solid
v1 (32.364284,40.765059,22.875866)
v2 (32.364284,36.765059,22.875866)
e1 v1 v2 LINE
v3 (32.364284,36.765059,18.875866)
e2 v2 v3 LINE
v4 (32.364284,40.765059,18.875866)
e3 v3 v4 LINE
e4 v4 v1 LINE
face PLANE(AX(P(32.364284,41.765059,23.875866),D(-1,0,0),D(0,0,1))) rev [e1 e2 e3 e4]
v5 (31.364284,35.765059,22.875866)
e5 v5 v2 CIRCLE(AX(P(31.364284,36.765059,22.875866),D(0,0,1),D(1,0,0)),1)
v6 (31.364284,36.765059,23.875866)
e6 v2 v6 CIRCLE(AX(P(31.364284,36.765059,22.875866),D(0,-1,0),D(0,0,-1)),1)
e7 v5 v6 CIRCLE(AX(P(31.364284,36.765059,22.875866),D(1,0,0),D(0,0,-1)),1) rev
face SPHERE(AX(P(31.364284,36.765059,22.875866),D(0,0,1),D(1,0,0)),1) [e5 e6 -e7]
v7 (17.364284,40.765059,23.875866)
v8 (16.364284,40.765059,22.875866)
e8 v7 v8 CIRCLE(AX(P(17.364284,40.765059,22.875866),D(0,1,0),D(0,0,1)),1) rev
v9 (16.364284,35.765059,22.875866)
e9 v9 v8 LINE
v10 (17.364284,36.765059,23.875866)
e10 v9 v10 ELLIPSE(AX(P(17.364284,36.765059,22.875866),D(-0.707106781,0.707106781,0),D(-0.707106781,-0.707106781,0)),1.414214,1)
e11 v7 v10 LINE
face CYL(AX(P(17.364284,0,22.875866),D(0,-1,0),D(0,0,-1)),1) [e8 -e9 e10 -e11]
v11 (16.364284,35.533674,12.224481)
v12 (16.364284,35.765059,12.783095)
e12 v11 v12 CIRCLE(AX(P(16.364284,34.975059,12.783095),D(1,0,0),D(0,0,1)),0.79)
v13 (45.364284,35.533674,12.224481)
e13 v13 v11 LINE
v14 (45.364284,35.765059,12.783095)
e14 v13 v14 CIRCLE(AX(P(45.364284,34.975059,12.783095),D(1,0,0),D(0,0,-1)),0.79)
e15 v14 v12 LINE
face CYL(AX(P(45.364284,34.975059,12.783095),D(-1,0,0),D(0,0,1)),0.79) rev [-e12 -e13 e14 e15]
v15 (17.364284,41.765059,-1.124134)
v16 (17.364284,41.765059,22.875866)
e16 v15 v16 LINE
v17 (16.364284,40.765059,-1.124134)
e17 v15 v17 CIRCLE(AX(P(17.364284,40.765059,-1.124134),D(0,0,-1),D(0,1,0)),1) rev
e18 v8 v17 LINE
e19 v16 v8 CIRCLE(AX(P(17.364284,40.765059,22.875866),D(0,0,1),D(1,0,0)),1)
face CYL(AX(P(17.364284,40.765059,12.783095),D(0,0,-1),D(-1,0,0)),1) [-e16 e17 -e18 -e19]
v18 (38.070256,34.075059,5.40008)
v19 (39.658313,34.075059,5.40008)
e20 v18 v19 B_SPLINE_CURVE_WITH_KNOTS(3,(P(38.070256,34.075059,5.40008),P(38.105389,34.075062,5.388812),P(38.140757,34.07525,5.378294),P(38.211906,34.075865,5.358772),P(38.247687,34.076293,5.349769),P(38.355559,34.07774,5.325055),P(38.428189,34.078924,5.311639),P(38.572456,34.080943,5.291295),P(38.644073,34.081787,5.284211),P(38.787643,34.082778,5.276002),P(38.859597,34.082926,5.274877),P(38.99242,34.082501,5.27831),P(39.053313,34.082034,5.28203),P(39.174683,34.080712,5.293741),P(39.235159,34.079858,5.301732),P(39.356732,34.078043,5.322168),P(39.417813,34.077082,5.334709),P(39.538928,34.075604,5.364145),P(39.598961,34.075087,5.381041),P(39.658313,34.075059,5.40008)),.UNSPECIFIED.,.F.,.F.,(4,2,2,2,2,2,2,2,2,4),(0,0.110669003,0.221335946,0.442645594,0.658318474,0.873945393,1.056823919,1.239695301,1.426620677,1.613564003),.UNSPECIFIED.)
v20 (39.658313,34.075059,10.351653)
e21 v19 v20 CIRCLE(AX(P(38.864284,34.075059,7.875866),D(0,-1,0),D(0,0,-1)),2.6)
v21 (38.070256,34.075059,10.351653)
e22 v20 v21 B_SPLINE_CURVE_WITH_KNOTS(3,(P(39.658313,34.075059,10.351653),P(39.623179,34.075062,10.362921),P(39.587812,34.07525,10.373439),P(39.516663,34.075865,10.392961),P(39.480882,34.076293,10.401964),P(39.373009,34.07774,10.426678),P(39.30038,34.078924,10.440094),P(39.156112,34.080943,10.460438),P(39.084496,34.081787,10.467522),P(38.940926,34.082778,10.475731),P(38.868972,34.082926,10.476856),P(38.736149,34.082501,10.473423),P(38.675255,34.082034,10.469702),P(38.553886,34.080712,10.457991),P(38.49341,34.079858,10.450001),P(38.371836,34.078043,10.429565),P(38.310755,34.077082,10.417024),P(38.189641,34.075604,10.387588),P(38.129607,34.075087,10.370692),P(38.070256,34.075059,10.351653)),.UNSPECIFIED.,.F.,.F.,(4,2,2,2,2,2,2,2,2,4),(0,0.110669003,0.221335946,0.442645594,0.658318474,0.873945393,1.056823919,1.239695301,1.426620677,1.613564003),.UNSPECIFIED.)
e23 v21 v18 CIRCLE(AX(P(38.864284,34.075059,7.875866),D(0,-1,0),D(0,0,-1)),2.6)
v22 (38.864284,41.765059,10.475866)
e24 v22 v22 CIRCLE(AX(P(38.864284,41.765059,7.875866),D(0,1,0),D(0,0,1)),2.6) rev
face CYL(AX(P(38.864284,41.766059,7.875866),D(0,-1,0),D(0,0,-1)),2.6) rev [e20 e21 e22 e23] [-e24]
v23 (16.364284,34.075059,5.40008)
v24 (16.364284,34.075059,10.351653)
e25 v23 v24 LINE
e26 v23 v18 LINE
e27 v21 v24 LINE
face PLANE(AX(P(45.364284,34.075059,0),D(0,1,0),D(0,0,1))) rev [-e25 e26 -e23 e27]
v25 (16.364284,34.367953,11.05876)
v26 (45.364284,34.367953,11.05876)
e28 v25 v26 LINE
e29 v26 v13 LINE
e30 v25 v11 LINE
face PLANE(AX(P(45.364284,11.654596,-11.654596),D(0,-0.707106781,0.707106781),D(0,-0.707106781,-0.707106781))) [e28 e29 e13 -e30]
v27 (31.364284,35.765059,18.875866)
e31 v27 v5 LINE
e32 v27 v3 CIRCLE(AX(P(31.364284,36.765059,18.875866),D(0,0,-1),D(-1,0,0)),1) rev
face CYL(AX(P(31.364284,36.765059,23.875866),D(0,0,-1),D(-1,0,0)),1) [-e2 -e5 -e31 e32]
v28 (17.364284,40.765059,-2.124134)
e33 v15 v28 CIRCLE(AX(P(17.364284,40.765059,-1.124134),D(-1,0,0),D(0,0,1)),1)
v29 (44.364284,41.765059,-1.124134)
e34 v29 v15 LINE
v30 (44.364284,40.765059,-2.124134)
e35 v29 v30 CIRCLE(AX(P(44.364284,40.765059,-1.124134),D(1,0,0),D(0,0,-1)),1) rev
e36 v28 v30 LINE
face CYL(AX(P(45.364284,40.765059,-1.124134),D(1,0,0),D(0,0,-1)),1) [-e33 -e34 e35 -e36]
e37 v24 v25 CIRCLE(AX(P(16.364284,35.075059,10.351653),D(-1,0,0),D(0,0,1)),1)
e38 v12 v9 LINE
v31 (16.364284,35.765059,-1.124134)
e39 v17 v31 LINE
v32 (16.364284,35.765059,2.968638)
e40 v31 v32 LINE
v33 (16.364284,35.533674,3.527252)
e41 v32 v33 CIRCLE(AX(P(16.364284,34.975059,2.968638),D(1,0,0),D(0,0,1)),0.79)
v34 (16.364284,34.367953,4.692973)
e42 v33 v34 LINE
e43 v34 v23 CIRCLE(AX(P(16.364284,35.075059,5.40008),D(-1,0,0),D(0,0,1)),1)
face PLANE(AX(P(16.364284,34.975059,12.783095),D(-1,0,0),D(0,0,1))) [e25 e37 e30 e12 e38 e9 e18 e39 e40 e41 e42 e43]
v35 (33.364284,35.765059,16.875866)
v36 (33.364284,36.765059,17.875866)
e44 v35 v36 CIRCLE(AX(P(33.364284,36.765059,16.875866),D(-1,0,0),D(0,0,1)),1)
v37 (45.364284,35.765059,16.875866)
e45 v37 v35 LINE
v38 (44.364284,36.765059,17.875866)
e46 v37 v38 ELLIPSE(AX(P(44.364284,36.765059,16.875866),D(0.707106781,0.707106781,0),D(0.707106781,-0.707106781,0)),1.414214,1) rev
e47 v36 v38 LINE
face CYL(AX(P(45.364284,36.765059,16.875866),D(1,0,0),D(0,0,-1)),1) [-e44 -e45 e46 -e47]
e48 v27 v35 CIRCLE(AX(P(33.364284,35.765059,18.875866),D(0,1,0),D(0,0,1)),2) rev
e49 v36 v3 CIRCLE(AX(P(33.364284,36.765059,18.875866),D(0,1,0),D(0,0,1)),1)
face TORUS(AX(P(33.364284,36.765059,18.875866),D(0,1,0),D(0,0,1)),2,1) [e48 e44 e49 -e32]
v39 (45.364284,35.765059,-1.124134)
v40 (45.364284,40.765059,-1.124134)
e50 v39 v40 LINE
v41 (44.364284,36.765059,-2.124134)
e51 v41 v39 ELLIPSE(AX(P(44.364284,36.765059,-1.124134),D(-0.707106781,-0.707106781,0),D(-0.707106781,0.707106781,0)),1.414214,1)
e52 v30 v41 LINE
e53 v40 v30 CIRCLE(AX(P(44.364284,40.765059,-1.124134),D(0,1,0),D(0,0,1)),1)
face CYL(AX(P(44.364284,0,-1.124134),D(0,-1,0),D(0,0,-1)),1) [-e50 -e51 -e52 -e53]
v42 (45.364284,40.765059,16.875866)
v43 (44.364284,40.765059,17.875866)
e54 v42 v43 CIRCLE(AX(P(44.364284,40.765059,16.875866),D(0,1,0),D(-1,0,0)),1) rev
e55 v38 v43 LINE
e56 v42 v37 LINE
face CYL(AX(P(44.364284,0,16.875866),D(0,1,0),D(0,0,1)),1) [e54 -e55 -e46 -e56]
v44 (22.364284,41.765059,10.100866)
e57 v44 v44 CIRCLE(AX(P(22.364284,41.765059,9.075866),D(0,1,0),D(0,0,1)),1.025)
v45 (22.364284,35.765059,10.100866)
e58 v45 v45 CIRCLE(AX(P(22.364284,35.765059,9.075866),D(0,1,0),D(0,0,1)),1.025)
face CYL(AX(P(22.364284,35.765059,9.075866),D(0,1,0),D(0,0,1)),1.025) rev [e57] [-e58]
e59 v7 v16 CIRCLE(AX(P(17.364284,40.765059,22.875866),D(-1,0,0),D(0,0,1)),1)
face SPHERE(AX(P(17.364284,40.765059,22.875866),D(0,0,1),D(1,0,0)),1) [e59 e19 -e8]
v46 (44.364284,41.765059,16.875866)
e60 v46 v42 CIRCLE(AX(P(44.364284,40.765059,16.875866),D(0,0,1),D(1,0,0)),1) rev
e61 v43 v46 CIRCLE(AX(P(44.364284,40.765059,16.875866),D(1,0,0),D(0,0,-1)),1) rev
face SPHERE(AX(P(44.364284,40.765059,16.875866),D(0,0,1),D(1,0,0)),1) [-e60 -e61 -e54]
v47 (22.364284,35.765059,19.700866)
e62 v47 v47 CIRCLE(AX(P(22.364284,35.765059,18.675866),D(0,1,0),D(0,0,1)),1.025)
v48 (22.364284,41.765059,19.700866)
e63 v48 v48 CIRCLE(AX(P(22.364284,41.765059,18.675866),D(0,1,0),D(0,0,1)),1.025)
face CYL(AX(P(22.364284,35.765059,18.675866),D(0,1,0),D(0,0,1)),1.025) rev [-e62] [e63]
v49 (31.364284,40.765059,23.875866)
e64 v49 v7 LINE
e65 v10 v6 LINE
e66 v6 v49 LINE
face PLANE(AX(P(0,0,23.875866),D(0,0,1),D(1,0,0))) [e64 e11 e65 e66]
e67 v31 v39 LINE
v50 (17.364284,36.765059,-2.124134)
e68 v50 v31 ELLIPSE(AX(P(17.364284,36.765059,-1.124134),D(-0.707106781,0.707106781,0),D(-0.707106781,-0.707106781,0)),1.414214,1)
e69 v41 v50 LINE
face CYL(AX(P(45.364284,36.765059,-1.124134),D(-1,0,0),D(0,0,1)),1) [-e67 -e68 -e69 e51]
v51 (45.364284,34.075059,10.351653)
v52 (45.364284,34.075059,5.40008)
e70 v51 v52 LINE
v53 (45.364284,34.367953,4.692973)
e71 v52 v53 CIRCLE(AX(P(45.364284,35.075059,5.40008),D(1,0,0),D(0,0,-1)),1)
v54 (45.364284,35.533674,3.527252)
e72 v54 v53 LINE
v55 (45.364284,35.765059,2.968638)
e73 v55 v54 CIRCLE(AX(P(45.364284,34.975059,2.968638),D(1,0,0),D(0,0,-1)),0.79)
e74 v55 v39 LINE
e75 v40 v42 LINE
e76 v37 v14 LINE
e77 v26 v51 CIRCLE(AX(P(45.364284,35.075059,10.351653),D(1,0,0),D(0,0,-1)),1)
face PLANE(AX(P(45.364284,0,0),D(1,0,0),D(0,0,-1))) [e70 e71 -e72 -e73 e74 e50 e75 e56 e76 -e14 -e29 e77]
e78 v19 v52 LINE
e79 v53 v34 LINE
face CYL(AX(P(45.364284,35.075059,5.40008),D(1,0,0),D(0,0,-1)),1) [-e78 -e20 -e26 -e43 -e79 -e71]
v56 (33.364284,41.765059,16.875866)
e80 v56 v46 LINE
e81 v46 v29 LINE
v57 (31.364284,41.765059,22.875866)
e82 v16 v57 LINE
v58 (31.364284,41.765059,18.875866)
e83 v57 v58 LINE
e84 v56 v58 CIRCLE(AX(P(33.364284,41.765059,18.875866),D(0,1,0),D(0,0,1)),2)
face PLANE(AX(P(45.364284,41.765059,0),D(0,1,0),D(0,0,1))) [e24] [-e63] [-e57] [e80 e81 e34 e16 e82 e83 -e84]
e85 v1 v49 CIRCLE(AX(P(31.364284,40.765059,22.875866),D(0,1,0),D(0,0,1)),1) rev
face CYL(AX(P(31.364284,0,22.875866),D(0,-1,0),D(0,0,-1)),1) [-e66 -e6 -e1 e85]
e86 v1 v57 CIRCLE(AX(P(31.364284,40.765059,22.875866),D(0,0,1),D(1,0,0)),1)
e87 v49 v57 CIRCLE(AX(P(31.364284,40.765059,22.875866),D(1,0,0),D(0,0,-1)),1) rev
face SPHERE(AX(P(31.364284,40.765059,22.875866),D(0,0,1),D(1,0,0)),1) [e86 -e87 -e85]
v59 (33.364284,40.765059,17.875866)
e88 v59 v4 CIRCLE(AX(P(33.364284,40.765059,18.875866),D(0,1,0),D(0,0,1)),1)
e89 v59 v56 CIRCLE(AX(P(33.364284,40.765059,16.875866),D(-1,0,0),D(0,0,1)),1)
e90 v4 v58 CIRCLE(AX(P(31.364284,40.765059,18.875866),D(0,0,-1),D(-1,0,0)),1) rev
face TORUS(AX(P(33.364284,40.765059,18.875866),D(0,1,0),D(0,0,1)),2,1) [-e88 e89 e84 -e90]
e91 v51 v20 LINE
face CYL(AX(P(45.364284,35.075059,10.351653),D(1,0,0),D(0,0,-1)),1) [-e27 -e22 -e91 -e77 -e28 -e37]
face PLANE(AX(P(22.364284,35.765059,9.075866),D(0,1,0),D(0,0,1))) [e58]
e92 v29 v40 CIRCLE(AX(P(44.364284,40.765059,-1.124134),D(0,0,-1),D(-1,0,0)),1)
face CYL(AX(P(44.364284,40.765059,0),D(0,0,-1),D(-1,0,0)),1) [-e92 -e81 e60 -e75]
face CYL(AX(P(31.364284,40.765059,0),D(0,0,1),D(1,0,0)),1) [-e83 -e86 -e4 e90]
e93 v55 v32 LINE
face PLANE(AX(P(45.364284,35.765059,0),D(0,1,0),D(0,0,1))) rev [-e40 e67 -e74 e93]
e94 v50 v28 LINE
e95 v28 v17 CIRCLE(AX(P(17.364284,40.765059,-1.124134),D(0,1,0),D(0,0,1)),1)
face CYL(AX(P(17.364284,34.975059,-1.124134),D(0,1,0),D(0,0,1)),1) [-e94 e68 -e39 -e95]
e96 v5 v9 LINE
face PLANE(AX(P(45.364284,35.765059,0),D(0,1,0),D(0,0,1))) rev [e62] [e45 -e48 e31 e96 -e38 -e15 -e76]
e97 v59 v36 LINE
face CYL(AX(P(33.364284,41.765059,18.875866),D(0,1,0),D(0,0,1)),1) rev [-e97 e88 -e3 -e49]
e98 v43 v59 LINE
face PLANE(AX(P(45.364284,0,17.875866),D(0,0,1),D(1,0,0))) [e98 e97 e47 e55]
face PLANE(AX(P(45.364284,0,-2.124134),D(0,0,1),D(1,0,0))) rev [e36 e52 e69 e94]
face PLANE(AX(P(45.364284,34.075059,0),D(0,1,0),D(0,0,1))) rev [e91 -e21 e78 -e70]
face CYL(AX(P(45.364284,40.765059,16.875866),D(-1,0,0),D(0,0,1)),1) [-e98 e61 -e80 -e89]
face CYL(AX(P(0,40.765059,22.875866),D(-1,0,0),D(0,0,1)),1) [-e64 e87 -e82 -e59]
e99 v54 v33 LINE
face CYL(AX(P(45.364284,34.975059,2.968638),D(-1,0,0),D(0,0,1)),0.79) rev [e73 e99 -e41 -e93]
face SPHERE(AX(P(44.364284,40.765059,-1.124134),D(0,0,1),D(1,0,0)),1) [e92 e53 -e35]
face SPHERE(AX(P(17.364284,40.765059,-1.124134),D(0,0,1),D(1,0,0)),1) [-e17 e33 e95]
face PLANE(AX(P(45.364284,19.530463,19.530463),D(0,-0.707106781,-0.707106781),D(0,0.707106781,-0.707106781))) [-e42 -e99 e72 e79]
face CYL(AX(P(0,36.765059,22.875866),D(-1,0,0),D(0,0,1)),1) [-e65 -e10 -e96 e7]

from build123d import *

# Parameters (mm, degrees)
SKETCH1_W           = 20
SKETCH1_H           = 6
BOSS_EXTRUDE1_DEPTH = 13
CUT_EXTRUDE1_REACH  = 51.362
SKETCH2_R           = 2.6
BOSS_EXTRUDE3_START = 16
BOSS_EXTRUDE3_DEPTH = 16
SKETCH6_W           = 16
SKETCH6_H           = 6
BOSS_EXTRUDE4_DEPTH = 6
SKETCH7_R           = 1.025
CUT_EXTRUDE3_DEPTH  = 6
FILLET3_R           = 1


with BuildPart() as part:
    # Sketch1 → Boss-Extrude1 (new body)
    with BuildSketch(Plane(origin=(32.364284334, 0, 0), x_dir=(0, 0, -1), z_dir=(1, 0, 0))):
        with Locations((-7.875866483, 38.765059464)):
            Rectangle(SKETCH1_W, SKETCH1_H)
        with BuildLine():
            Line((-12.22448084, 35.533673821), (-10.765866483, 34.075059464))
            Line((-10.765866483, 34.075059464), (-4.985866483, 34.075059464))
            Line((-4.985866483, 34.075059464), (-3.527252126, 35.533673821))
            ThreePointArc((-3.527252126, 35.533673821), (-3.27095768, 35.704924294), (-2.968637768, 35.765059464))
            Line((-2.968637768, 35.765059464), (-12.783095197, 35.765059464))
            ThreePointArc((-12.783095197, 35.765059464), (-12.480775285, 35.704924294), (-12.22448084, 35.533673821))
        make_face()
    extrude(amount=BOSS_EXTRUDE1_DEPTH)

    # Sketch2 → Cut-Extrude1 (cut, up to next)
    with BuildSketch(Plane.XZ.offset(-34.075059464), mode=Mode.PRIVATE) as cut_extrude1_sk1:
        with Locations(Location((38.864284334, 7.875866483, 0), (0, 0, 270))):
            Circle(SKETCH2_R)
    cut_extrude1_tool1 = extrude(cut_extrude1_sk1.sketch, amount=-CUT_EXTRUDE1_REACH, mode=Mode.PRIVATE) & part.part
    add(cut_extrude1_tool1.solids().sort_by_distance((38.864284, 34.075059, 7.875866))[0], mode=Mode.SUBTRACT)

    # Sketch5 → Boss-Extrude3 (add)
    with BuildSketch(Plane.ZY.offset(-32.364284334).offset(BOSS_EXTRUDE3_START)):
        with BuildLine():
            Line((12.783095197, 35.765059464), (17.875866483, 35.765059464))
            Line((17.875866483, 35.765059464), (17.875866483, 41.765059464))
            Line((17.875866483, 41.765059464), (-2.124133517, 41.765059464))
            Line((-2.124133517, 41.765059464), (-2.124133517, 35.765059464))
            Line((-2.124133517, 35.765059464), (2.968637768, 35.765059464))
            ThreePointArc((2.968637768, 35.765059464), (3.27095768, 35.704924294), (3.527252126, 35.533673821))
            Line((3.527252126, 35.533673821), (4.985866483, 34.075059464))
            Line((4.985866483, 34.075059464), (10.765866483, 34.075059464))
            Line((10.765866483, 34.075059464), (12.22448084, 35.533673821))
            ThreePointArc((12.22448084, 35.533673821), (12.480775285, 35.704924294), (12.783095197, 35.765059464))
        make_face()
    extrude(amount=-BOSS_EXTRUDE3_DEPTH)

    # Sketch6 → Boss-Extrude4 (add)
    with BuildSketch(Plane.XY.offset(17.875866483)):
        with Locations((24.364284334, 38.765059464)):
            Rectangle(SKETCH6_W, SKETCH6_H)
    extrude(amount=BOSS_EXTRUDE4_DEPTH)

    # Sketch7 → Cut-Extrude3 (cut)
    with BuildSketch(Plane(origin=(0, 41.765059464, 0), x_dir=(1, 0, 0), z_dir=(0, 1, 0))):
        with Locations(Location((22.364284334, -9.075866483, 0), (0, 0, 270))):
            Circle(SKETCH7_R)
        with Locations(Location((22.364284334, -18.675866483, 0), (0, 0, 270))):
            Circle(SKETCH7_R)
    extrude(amount=-CUT_EXTRUDE3_DEPTH, mode=Mode.SUBTRACT)

    # Fillet3
    # the kernel refuses this fillet: 1 mm, written as the material it adds along each edge
    with BuildSketch(Plane(origin=(32.364284334, 41.765059464, 17.875866483), x_dir=(1, 0, 0), z_dir=(0, -1, 0))) as fillet3_piece_1:
        with BuildLine():
            CenterArc((FILLET3_R, FILLET3_R), FILLET3_R, 180, 90)
            Line((0, FILLET3_R), (0, 0))
            Line((0, 0), (FILLET3_R, 0))
        make_face()
    extrude(amount=6)
    # the kernel refuses this fillet: 1 mm, written as the material it takes off along each edge
    with BuildSketch(Plane(origin=(17.364284334, 40.765059464, 22.875866483), x_dir=(-1, 0, 0), z_dir=(0, 1, 0))) as fillet3_2_piece_1_section:
        Polygon((0, 0), (FILLET3_R, 0), (FILLET3_R, FILLET3_R), (0, FILLET3_R), align=None)
    fillet3_2_piece_1 = extrude(amount=FILLET3_R, mode=Mode.PRIVATE)
    fillet3_2_piece_1 = fillet3_2_piece_1 - Plane(origin=(17.364284334, 40.765059464, 22.875866483), x_dir=(0.7071067811865475, 0, -0.7071067811865475), z_dir=(0, 1, 0)) * Sphere(FILLET3_R, mode=Mode.PRIVATE)
    add(fillet3_2_piece_1, mode=Mode.SUBTRACT)
    with BuildSketch(Plane(origin=(17.364284334, 40.765059464, -1.124133517), x_dir=(-1, 0, 0), z_dir=(0, 1, 0))) as fillet3_2_piece_2_section:
        Polygon((0, 0), (FILLET3_R, 0), (FILLET3_R, -FILLET3_R), (0, -FILLET3_R), align=None)
    fillet3_2_piece_2 = extrude(amount=FILLET3_R, mode=Mode.PRIVATE)
    fillet3_2_piece_2 = fillet3_2_piece_2 - Plane(origin=(17.364284334, 40.765059464, -1.124133517), x_dir=(0.7071067811865475, 0, 0.7071067811865475), z_dir=(0, 1, 0)) * Sphere(FILLET3_R, mode=Mode.PRIVATE)
    add(fillet3_2_piece_2, mode=Mode.SUBTRACT)
    with BuildSketch(Plane(origin=(31.364284334, 36.765059464, 22.875866483), x_dir=(0, 0, 1), z_dir=(0, -1, 0))) as fillet3_2_piece_3_section:
        Polygon((0, 0), (FILLET3_R, 0), (FILLET3_R, -FILLET3_R), (0, -FILLET3_R), align=None)
    fillet3_2_piece_3 = extrude(amount=FILLET3_R, mode=Mode.PRIVATE)
    fillet3_2_piece_3 = fillet3_2_piece_3 - Plane(origin=(31.364284334, 36.765059464, 22.875866483), x_dir=(-0.7071067811865475, 0, -0.7071067811865475), z_dir=(0, -1, 0)) * Sphere(FILLET3_R, mode=Mode.PRIVATE)
    add(fillet3_2_piece_3, mode=Mode.SUBTRACT)
    with BuildSketch(Plane(origin=(31.364284334, 40.765059464, 22.875866483), x_dir=(0, 0, 1), z_dir=(0, 1, 0))) as fillet3_2_piece_4_section:
        Polygon((0, 0), (FILLET3_R, 0), (FILLET3_R, FILLET3_R), (0, FILLET3_R), align=None)
    fillet3_2_piece_4 = extrude(amount=FILLET3_R, mode=Mode.PRIVATE)
    fillet3_2_piece_4 = fillet3_2_piece_4 - Plane(origin=(31.364284334, 40.765059464, 22.875866483), x_dir=(-0.7071067811865475, 0, -0.7071067811865475), z_dir=(0, 1, 0)) * Sphere(FILLET3_R, mode=Mode.PRIVATE)
    add(fillet3_2_piece_4, mode=Mode.SUBTRACT)
    with BuildSketch(Plane(origin=(44.364284334, 40.765059464, 16.875866483), x_dir=(1, 0, 0), z_dir=(0, 1, 0))) as fillet3_2_piece_5_section:
        Polygon((0, 0), (FILLET3_R, 0), (FILLET3_R, -FILLET3_R), (0, -FILLET3_R), align=None)
    fillet3_2_piece_5 = extrude(amount=FILLET3_R, mode=Mode.PRIVATE)
    fillet3_2_piece_5 = fillet3_2_piece_5 - Plane(origin=(44.364284334, 40.765059464, 16.875866483), x_dir=(-0.7071067811865475, 0, -0.7071067811865475), z_dir=(0, 1, 0)) * Sphere(FILLET3_R, mode=Mode.PRIVATE)
    add(fillet3_2_piece_5, mode=Mode.SUBTRACT)
    with BuildSketch(Plane(origin=(44.364284334, 40.765059464, -1.124133517), x_dir=(0, 0, -1), z_dir=(0, 1, 0))) as fillet3_2_piece_6_section:
        Polygon((0, 0), (FILLET3_R, 0), (FILLET3_R, -FILLET3_R), (0, -FILLET3_R), align=None)
    fillet3_2_piece_6 = extrude(amount=FILLET3_R, mode=Mode.PRIVATE)
    fillet3_2_piece_6 = fillet3_2_piece_6 - Plane(origin=(44.364284334, 40.765059464, -1.124133517), x_dir=(-0.7071067811865475, 0, 0.7071067811865475), z_dir=(0, 1, 0)) * Sphere(FILLET3_R, mode=Mode.PRIVATE)
    add(fillet3_2_piece_6, mode=Mode.SUBTRACT)
    with BuildSketch(Plane(origin=(16.364284334, 41.765059464, 22.875866483), x_dir=(0, -1, 0), z_dir=(0, 0, -1))) as fillet3_2_piece_7:
        with BuildLine():
            CenterArc((FILLET3_R, -FILLET3_R), FILLET3_R, 90, 90)
            Line((0, -FILLET3_R), (0, 0))
            Line((0, 0), (FILLET3_R, 0))
        make_face()
    extrude(amount=24, mode=Mode.SUBTRACT)
    with BuildSketch(Plane(origin=(16.364284334, 40.765059464, -2.124133517), x_dir=(0, 0, 1), z_dir=(0, -1, 0)), Plane(origin=(16.364284334, 33.265059464, 23.875866483), x_dir=(0, 0, -1), z_dir=(0, 1, 0)), Plane(origin=(45.364284334, 33.265059464, -2.124133517), x_dir=(0, 0, 1), z_dir=(0, 1, 0)), Plane(origin=(45.364284334, 40.765059464, 17.875866483), x_dir=(0, 0, -1), z_dir=(0, -1, 0))) as fillet3_2_piece_8:
        with BuildLine():
            CenterArc((FILLET3_R, -FILLET3_R), FILLET3_R, 90, 90)
            Line((0, -FILLET3_R), (0, 0))
            Line((0, 0), (FILLET3_R, 0))
        make_face()
    extrude(amount=7.5, mode=Mode.SUBTRACT)
    with BuildSketch(Plane(origin=(32.364284334, 35.765059464, 18.875866483), x_dir=(-1, 0, 0), z_dir=(0, 0, 1)), Plane(origin=(32.364284334, 41.765059464, 18.875866483), x_dir=(0, -1, 0), z_dir=(0, 0, 1))) as fillet3_2_piece_9:
        with BuildLine():
            CenterArc((FILLET3_R, -FILLET3_R), FILLET3_R, 90, 90)
            Line((0, -FILLET3_R), (0, 0))
            Line((0, 0), (FILLET3_R, 0))
        make_face()
    extrude(amount=4, mode=Mode.SUBTRACT)
    with BuildSketch(Plane(origin=(31.364284334, 35.765059464, 23.875866483), x_dir=(0, 0, -1), z_dir=(-1, 0, 0))) as fillet3_2_piece_10:
        with BuildLine():
            CenterArc((FILLET3_R, -FILLET3_R), FILLET3_R, 90, 90)
            Line((0, -FILLET3_R), (0, 0))
            Line((0, 0), (FILLET3_R, 0))
        make_face()
    extrude(amount=17.5, mode=Mode.SUBTRACT)
    with BuildSketch(Plane(origin=(32.364284334, 40.765059464, 23.875866483), x_dir=(-1, 0, 0), z_dir=(0, -1, 0))) as fillet3_2_piece_11:
        with BuildLine():
            CenterArc((FILLET3_R, FILLET3_R), FILLET3_R, 180, 90)
            Line((0, FILLET3_R), (0, 0))
            Line((0, 0), (FILLET3_R, 0))
        make_face()
    extrude(amount=4, mode=Mode.SUBTRACT)
    with BuildSketch(Plane(origin=(17.364284334, 41.765059464, 23.875866483), x_dir=(0, -1, 0), z_dir=(1, 0, 0))) as fillet3_2_piece_12:
        with BuildLine():
            CenterArc((FILLET3_R, FILLET3_R), FILLET3_R, 180, 90)
            Line((0, FILLET3_R), (0, 0))
            Line((0, 0), (FILLET3_R, 0))
        make_face()
    extrude(amount=14, mode=Mode.SUBTRACT)
    with BuildSketch(Plane(origin=(47.864284334, 35.765059464, 17.875866483), x_dir=(0, 0, -1), z_dir=(-1, 0, 0))) as fillet3_2_piece_13:
        with BuildLine():
            CenterArc((FILLET3_R, -FILLET3_R), FILLET3_R, 90, 90)
            Line((0, -FILLET3_R), (0, 0))
            Line((0, 0), (FILLET3_R, 0))
        make_face()
    extrude(amount=14.5, mode=Mode.SUBTRACT)
    with BuildSketch(Plane(origin=(44.364284334, 41.765059464, 17.875866483), x_dir=(0, -1, 0), z_dir=(-1, 0, 0))) as fillet3_2_piece_14:
        with BuildLine():
            CenterArc((FILLET3_R, -FILLET3_R), FILLET3_R, 90, 90)
            Line((0, -FILLET3_R), (0, 0))
            Line((0, 0), (FILLET3_R, 0))
        make_face()
    extrude(amount=11, mode=Mode.SUBTRACT)
    with BuildSketch(Plane(origin=(17.364284334, 41.765059464, -2.124133517), x_dir=(0, 0, 1), z_dir=(1, 0, 0))) as fillet3_2_piece_15:
        with BuildLine():
            CenterArc((FILLET3_R, FILLET3_R), FILLET3_R, 180, 90)
            Line((0, FILLET3_R), (0, 0))
            Line((0, 0), (FILLET3_R, 0))
        make_face()
    extrude(amount=27, mode=Mode.SUBTRACT)
    with BuildSketch(Plane(origin=(13.864284334, 35.765059464, -2.124133517), x_dir=(0, 1, 0), z_dir=(1, 0, 0))) as fillet3_2_piece_16:
        with BuildLine():
            CenterArc((FILLET3_R, FILLET3_R), FILLET3_R, 180, 90)
            Line((0, FILLET3_R), (0, 0))
            Line((0, 0), (FILLET3_R, 0))
        make_face()
    extrude(amount=34, mode=Mode.SUBTRACT)
    with BuildSketch(Plane(origin=(15.328750428, 34.075059464, 4.985866483), x_dir=(0, 0.7071067811865497, -0.7071067811865454), z_dir=(1, 0, 0))) as fillet3_2_piece_17:
        with BuildLine():
            CenterArc((FILLET3_R * 0.414213562373, FILLET3_R), FILLET3_R, 225, 45)
            Line((-FILLET3_R * 0.292893218813, FILLET3_R * 0.292893218813), (0, 0))
            Line((0, 0), (FILLET3_R * 0.414213562373, 0))
        make_face()
    extrude(amount=31.071067812, mode=Mode.SUBTRACT)
    with BuildSketch(Plane(origin=(15.328750428, 34.075059464, 10.765866483), x_dir=(0, 0.7071067811865432, 0.7071067811865518), z_dir=(1, 0, 0))) as fillet3_2_piece_18:
        with BuildLine():
            CenterArc((FILLET3_R * 0.414213562373, -FILLET3_R), FILLET3_R, 90, 45)
            Line((-FILLET3_R * 0.292893218813, -FILLET3_R * 0.292893218813), (0, 0))
            Line((0, 0), (FILLET3_R * 0.414213562373, 0))
        make_face()
    extrude(amount=31.071067812, mode=Mode.SUBTRACT)
    with BuildSketch(Plane(origin=(45.364284334, 41.765059464, -1.124133517), x_dir=(0, -1, 0), z_dir=(0, 0, 1))) as fillet3_2_piece_19:
        with BuildLine():
            CenterArc((FILLET3_R, -FILLET3_R), FILLET3_R, 90, 90)
            Line((0, -FILLET3_R), (0, 0))
            Line((0, 0), (FILLET3_R, 0))
        make_face()
    extrude(amount=18, mode=Mode.SUBTRACT)
    with BuildSketch(Plane(origin=(33.364284334, 41.765059464, 18.875866483), x_dir=(0, 0, -1), z_dir=(1, 0, 0))) as fillet3_2_piece_20:
        with BuildLine():
            CenterArc((1 + FILLET3_R, -FILLET3_R), FILLET3_R, 90, 90)
            Line((1, -FILLET3_R), (1, 0))
            Line((1, 0), (1 + FILLET3_R, 0))
        make_face()
    revolve(axis=Axis((33.364284334, 41.765059464, 18.875866483), (0, 1, 0)), revolution_arc=90, mode=Mode.SUBTRACT)
    with BuildSketch(Plane(origin=(33.364284334, 35.765059464, 18.875866483), x_dir=(0, 0, -1), z_dir=(1, 0, 0))) as fillet3_2_piece_21:
        with BuildLine():
            CenterArc((1 + FILLET3_R, FILLET3_R), FILLET3_R, 180, 90)
            Line((1, FILLET3_R), (1, 0))
            Line((1, 0), (1 + FILLET3_R, 0))
        make_face()
    revolve(axis=Axis((33.364284334, 35.765059464, 18.875866483), (0, 1, 0)), revolution_arc=90, mode=Mode.SUBTRACT)


solid = part.part
